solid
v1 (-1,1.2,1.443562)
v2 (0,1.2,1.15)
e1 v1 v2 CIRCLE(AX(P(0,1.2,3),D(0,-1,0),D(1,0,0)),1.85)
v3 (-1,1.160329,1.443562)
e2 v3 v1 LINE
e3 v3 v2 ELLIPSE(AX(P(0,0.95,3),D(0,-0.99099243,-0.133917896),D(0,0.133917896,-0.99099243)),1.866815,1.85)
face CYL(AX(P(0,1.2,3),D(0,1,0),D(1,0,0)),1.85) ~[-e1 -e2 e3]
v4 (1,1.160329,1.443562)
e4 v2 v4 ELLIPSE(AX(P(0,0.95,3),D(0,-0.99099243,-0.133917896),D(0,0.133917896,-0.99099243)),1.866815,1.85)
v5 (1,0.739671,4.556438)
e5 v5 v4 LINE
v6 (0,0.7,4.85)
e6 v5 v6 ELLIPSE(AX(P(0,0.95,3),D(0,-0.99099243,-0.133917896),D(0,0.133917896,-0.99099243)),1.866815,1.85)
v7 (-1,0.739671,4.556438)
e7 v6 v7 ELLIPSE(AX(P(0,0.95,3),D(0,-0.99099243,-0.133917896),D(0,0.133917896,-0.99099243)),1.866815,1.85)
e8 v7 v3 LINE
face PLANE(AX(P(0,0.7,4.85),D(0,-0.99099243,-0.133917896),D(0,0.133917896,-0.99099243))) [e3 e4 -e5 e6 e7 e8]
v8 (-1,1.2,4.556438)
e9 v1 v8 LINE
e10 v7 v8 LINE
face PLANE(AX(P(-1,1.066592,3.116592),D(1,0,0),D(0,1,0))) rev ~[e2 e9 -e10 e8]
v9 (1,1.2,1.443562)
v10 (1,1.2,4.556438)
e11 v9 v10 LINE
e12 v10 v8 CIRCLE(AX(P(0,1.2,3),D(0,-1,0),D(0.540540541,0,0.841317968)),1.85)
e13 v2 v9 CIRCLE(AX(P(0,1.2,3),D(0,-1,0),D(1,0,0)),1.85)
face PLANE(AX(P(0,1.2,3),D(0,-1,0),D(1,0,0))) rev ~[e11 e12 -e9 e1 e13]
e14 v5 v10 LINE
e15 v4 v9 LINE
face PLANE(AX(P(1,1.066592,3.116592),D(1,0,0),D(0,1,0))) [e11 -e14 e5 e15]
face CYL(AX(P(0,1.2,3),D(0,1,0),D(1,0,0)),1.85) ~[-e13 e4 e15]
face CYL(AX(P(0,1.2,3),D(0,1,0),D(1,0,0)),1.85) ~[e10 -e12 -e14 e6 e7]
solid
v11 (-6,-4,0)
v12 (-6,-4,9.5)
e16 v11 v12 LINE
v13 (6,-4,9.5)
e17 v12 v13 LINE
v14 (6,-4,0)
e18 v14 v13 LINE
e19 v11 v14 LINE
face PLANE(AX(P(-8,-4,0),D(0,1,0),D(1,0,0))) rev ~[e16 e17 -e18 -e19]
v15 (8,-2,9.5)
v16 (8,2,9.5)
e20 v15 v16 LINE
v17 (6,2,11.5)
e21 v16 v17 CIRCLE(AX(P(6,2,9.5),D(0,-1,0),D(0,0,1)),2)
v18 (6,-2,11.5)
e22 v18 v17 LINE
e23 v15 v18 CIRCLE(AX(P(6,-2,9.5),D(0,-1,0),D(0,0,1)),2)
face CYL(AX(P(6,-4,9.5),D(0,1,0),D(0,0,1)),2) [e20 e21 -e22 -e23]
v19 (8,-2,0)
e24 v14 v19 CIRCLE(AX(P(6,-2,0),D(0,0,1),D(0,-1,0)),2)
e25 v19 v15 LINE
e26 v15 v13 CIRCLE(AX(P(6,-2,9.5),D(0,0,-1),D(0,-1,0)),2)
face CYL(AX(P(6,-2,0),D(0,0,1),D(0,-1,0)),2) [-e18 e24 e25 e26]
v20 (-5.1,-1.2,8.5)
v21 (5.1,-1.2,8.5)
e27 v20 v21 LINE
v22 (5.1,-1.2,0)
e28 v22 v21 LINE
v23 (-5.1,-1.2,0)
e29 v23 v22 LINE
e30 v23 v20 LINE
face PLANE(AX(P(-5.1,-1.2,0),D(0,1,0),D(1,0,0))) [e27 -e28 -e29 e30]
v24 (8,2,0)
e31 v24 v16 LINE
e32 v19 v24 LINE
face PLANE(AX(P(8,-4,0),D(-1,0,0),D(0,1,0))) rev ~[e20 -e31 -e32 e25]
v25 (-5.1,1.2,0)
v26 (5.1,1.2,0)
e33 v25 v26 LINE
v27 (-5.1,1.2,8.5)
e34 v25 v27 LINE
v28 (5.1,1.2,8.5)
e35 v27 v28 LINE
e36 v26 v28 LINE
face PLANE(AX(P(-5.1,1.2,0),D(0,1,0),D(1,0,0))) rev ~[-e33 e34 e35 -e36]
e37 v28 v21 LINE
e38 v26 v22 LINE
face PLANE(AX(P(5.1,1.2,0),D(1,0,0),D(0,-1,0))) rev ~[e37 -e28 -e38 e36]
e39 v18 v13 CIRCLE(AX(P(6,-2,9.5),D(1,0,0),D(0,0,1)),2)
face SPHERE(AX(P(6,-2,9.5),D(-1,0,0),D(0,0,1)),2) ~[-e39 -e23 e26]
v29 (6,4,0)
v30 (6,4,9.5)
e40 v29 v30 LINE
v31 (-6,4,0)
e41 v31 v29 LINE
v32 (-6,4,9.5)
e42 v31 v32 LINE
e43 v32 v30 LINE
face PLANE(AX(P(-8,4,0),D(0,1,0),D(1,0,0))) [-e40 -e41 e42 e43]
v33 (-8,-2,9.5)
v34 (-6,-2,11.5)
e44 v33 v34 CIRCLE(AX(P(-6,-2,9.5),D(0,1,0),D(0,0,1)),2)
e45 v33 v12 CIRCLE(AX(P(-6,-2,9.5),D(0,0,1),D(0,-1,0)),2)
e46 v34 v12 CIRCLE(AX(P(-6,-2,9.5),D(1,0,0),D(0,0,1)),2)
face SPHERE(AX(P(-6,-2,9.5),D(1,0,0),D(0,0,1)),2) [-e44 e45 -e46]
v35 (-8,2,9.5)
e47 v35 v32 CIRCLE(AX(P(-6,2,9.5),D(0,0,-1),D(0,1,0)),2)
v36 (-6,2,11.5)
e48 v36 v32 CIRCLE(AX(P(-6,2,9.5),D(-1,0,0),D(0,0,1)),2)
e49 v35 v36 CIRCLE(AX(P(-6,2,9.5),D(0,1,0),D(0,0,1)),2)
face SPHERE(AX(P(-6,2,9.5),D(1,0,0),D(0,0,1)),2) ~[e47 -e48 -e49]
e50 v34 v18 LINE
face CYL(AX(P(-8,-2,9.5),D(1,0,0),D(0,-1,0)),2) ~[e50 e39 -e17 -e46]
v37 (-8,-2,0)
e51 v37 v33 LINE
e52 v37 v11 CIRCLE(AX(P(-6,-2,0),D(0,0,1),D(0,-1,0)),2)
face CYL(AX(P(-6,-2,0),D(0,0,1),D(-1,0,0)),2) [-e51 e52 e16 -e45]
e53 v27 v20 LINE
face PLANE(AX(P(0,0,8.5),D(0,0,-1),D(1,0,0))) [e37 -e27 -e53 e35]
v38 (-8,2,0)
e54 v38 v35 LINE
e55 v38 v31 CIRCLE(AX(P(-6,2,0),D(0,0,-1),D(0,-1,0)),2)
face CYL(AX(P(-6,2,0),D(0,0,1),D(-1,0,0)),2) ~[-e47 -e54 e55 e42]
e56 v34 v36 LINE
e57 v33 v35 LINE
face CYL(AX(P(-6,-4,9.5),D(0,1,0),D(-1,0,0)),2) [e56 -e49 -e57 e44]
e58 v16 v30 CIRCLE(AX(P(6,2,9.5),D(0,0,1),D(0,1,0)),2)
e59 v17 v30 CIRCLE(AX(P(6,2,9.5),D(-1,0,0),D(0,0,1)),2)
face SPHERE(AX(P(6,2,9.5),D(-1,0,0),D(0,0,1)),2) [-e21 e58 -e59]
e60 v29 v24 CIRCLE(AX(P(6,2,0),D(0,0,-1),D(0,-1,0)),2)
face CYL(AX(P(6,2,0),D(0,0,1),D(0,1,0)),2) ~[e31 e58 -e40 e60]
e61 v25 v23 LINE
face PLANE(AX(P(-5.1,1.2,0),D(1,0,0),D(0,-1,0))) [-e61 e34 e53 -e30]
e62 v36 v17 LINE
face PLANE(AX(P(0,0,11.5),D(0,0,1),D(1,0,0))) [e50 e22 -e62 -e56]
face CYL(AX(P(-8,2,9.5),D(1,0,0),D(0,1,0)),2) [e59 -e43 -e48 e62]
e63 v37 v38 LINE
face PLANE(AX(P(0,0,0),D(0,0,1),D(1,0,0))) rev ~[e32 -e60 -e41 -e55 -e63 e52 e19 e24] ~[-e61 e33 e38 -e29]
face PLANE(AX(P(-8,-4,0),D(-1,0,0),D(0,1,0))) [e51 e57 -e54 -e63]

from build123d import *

# Parameters (mm, degrees)
F0_W      = 16
F0_H      = 8
F1_DEPTH  = 11.5
F2_W      = 10.2
F2_H      = 2.4
F3_DEPTH  = 8.5
F4_R      = 1.85
F5_DEPTH  = 0.5
F7_W      = 2
F7_H      = 3.7
F8_DEPTH  = 0.8
F9_SIZE2  = 3.69999
F9_SIZE   = 0.49999
F12_DEPTH = 1
F14_R     = 2


# Not quite as in the source:
# - a fillet or chamfer is up to 0.001 mm smaller than in the source, because OpenCascade refuses the exact size


with BuildPart() as f1:
    # F0 (on Top) → F1 (new body)
    with BuildSketch(Plane.XY):
        Rectangle(F0_W, F0_H)
    extrude(amount=F1_DEPTH)

    # F2 (on face) → F3 (cut)
    with BuildSketch(Plane(origin=(0, 0, 0), x_dir=(1, 0, 0), z_dir=(0, 0, -1))):
        Rectangle(F2_W, F2_H)
    extrude(amount=-F3_DEPTH, mode=Mode.SUBTRACT)

    # F14
    f14_edges = [f1.edges().sort_by_distance(p)[0] for p in [
        (0, -4, 11.5),
        (0, 4, 11.5),
        (8, 0, 11.5),
        (-8, 0, 11.5),
        (-8, -4, 5.75),
        (8, -4, 5.75),
        (8, 4, 5.75),
        (-8, 4, 5.75),
    ]]
    fillet(f14_edges, radius=F14_R)


with BuildPart() as f5:
    # F4 (on face) → F5 (new body)
    with BuildSketch(Plane.XZ.offset(-1.2)):
        with Locations((0, 3)):
            Circle(F4_R)
    extrude(amount=F5_DEPTH)


with BuildPart() as f8:
    # F7 (on face) → F8 (new body)
    with BuildSketch(Plane.XZ.offset(-1.2)):
        with Locations((0, 3)):
            Rectangle(F7_W, F7_H)
    extrude(amount=F8_DEPTH)

    # F9 (size 0.5 and 3.7 in the source; OpenCascade refuses exactly that, so slightly less here)
    f9_edges = [f8.edges().sort_by_distance(p)[0] for p in [
        (0, 0.4, 1.15),
    ]]
    f9_side = f8.faces().sort_by_distance((0, 0.8, 1.15))[0]
    chamfer(f9_edges, length=F9_SIZE, length2=F9_SIZE2, reference=f9_side)


with BuildPart() as f12:
    # F11 (on Right) → F12 (new body, symmetric)
    with BuildSketch(Plane.YZ):
        Polygon((1.2, 1.15), (1.2, 4.85), (0.7, 4.85), align=None)
    extrude(amount=F12_DEPTH, both=True)


with BuildPart() as f5_1:
    add(f5.part)

    # F13: intersect F12
    add(f12.part, mode=Mode.INTERSECT)


solid = Compound([f1.part, f5_1.part])
